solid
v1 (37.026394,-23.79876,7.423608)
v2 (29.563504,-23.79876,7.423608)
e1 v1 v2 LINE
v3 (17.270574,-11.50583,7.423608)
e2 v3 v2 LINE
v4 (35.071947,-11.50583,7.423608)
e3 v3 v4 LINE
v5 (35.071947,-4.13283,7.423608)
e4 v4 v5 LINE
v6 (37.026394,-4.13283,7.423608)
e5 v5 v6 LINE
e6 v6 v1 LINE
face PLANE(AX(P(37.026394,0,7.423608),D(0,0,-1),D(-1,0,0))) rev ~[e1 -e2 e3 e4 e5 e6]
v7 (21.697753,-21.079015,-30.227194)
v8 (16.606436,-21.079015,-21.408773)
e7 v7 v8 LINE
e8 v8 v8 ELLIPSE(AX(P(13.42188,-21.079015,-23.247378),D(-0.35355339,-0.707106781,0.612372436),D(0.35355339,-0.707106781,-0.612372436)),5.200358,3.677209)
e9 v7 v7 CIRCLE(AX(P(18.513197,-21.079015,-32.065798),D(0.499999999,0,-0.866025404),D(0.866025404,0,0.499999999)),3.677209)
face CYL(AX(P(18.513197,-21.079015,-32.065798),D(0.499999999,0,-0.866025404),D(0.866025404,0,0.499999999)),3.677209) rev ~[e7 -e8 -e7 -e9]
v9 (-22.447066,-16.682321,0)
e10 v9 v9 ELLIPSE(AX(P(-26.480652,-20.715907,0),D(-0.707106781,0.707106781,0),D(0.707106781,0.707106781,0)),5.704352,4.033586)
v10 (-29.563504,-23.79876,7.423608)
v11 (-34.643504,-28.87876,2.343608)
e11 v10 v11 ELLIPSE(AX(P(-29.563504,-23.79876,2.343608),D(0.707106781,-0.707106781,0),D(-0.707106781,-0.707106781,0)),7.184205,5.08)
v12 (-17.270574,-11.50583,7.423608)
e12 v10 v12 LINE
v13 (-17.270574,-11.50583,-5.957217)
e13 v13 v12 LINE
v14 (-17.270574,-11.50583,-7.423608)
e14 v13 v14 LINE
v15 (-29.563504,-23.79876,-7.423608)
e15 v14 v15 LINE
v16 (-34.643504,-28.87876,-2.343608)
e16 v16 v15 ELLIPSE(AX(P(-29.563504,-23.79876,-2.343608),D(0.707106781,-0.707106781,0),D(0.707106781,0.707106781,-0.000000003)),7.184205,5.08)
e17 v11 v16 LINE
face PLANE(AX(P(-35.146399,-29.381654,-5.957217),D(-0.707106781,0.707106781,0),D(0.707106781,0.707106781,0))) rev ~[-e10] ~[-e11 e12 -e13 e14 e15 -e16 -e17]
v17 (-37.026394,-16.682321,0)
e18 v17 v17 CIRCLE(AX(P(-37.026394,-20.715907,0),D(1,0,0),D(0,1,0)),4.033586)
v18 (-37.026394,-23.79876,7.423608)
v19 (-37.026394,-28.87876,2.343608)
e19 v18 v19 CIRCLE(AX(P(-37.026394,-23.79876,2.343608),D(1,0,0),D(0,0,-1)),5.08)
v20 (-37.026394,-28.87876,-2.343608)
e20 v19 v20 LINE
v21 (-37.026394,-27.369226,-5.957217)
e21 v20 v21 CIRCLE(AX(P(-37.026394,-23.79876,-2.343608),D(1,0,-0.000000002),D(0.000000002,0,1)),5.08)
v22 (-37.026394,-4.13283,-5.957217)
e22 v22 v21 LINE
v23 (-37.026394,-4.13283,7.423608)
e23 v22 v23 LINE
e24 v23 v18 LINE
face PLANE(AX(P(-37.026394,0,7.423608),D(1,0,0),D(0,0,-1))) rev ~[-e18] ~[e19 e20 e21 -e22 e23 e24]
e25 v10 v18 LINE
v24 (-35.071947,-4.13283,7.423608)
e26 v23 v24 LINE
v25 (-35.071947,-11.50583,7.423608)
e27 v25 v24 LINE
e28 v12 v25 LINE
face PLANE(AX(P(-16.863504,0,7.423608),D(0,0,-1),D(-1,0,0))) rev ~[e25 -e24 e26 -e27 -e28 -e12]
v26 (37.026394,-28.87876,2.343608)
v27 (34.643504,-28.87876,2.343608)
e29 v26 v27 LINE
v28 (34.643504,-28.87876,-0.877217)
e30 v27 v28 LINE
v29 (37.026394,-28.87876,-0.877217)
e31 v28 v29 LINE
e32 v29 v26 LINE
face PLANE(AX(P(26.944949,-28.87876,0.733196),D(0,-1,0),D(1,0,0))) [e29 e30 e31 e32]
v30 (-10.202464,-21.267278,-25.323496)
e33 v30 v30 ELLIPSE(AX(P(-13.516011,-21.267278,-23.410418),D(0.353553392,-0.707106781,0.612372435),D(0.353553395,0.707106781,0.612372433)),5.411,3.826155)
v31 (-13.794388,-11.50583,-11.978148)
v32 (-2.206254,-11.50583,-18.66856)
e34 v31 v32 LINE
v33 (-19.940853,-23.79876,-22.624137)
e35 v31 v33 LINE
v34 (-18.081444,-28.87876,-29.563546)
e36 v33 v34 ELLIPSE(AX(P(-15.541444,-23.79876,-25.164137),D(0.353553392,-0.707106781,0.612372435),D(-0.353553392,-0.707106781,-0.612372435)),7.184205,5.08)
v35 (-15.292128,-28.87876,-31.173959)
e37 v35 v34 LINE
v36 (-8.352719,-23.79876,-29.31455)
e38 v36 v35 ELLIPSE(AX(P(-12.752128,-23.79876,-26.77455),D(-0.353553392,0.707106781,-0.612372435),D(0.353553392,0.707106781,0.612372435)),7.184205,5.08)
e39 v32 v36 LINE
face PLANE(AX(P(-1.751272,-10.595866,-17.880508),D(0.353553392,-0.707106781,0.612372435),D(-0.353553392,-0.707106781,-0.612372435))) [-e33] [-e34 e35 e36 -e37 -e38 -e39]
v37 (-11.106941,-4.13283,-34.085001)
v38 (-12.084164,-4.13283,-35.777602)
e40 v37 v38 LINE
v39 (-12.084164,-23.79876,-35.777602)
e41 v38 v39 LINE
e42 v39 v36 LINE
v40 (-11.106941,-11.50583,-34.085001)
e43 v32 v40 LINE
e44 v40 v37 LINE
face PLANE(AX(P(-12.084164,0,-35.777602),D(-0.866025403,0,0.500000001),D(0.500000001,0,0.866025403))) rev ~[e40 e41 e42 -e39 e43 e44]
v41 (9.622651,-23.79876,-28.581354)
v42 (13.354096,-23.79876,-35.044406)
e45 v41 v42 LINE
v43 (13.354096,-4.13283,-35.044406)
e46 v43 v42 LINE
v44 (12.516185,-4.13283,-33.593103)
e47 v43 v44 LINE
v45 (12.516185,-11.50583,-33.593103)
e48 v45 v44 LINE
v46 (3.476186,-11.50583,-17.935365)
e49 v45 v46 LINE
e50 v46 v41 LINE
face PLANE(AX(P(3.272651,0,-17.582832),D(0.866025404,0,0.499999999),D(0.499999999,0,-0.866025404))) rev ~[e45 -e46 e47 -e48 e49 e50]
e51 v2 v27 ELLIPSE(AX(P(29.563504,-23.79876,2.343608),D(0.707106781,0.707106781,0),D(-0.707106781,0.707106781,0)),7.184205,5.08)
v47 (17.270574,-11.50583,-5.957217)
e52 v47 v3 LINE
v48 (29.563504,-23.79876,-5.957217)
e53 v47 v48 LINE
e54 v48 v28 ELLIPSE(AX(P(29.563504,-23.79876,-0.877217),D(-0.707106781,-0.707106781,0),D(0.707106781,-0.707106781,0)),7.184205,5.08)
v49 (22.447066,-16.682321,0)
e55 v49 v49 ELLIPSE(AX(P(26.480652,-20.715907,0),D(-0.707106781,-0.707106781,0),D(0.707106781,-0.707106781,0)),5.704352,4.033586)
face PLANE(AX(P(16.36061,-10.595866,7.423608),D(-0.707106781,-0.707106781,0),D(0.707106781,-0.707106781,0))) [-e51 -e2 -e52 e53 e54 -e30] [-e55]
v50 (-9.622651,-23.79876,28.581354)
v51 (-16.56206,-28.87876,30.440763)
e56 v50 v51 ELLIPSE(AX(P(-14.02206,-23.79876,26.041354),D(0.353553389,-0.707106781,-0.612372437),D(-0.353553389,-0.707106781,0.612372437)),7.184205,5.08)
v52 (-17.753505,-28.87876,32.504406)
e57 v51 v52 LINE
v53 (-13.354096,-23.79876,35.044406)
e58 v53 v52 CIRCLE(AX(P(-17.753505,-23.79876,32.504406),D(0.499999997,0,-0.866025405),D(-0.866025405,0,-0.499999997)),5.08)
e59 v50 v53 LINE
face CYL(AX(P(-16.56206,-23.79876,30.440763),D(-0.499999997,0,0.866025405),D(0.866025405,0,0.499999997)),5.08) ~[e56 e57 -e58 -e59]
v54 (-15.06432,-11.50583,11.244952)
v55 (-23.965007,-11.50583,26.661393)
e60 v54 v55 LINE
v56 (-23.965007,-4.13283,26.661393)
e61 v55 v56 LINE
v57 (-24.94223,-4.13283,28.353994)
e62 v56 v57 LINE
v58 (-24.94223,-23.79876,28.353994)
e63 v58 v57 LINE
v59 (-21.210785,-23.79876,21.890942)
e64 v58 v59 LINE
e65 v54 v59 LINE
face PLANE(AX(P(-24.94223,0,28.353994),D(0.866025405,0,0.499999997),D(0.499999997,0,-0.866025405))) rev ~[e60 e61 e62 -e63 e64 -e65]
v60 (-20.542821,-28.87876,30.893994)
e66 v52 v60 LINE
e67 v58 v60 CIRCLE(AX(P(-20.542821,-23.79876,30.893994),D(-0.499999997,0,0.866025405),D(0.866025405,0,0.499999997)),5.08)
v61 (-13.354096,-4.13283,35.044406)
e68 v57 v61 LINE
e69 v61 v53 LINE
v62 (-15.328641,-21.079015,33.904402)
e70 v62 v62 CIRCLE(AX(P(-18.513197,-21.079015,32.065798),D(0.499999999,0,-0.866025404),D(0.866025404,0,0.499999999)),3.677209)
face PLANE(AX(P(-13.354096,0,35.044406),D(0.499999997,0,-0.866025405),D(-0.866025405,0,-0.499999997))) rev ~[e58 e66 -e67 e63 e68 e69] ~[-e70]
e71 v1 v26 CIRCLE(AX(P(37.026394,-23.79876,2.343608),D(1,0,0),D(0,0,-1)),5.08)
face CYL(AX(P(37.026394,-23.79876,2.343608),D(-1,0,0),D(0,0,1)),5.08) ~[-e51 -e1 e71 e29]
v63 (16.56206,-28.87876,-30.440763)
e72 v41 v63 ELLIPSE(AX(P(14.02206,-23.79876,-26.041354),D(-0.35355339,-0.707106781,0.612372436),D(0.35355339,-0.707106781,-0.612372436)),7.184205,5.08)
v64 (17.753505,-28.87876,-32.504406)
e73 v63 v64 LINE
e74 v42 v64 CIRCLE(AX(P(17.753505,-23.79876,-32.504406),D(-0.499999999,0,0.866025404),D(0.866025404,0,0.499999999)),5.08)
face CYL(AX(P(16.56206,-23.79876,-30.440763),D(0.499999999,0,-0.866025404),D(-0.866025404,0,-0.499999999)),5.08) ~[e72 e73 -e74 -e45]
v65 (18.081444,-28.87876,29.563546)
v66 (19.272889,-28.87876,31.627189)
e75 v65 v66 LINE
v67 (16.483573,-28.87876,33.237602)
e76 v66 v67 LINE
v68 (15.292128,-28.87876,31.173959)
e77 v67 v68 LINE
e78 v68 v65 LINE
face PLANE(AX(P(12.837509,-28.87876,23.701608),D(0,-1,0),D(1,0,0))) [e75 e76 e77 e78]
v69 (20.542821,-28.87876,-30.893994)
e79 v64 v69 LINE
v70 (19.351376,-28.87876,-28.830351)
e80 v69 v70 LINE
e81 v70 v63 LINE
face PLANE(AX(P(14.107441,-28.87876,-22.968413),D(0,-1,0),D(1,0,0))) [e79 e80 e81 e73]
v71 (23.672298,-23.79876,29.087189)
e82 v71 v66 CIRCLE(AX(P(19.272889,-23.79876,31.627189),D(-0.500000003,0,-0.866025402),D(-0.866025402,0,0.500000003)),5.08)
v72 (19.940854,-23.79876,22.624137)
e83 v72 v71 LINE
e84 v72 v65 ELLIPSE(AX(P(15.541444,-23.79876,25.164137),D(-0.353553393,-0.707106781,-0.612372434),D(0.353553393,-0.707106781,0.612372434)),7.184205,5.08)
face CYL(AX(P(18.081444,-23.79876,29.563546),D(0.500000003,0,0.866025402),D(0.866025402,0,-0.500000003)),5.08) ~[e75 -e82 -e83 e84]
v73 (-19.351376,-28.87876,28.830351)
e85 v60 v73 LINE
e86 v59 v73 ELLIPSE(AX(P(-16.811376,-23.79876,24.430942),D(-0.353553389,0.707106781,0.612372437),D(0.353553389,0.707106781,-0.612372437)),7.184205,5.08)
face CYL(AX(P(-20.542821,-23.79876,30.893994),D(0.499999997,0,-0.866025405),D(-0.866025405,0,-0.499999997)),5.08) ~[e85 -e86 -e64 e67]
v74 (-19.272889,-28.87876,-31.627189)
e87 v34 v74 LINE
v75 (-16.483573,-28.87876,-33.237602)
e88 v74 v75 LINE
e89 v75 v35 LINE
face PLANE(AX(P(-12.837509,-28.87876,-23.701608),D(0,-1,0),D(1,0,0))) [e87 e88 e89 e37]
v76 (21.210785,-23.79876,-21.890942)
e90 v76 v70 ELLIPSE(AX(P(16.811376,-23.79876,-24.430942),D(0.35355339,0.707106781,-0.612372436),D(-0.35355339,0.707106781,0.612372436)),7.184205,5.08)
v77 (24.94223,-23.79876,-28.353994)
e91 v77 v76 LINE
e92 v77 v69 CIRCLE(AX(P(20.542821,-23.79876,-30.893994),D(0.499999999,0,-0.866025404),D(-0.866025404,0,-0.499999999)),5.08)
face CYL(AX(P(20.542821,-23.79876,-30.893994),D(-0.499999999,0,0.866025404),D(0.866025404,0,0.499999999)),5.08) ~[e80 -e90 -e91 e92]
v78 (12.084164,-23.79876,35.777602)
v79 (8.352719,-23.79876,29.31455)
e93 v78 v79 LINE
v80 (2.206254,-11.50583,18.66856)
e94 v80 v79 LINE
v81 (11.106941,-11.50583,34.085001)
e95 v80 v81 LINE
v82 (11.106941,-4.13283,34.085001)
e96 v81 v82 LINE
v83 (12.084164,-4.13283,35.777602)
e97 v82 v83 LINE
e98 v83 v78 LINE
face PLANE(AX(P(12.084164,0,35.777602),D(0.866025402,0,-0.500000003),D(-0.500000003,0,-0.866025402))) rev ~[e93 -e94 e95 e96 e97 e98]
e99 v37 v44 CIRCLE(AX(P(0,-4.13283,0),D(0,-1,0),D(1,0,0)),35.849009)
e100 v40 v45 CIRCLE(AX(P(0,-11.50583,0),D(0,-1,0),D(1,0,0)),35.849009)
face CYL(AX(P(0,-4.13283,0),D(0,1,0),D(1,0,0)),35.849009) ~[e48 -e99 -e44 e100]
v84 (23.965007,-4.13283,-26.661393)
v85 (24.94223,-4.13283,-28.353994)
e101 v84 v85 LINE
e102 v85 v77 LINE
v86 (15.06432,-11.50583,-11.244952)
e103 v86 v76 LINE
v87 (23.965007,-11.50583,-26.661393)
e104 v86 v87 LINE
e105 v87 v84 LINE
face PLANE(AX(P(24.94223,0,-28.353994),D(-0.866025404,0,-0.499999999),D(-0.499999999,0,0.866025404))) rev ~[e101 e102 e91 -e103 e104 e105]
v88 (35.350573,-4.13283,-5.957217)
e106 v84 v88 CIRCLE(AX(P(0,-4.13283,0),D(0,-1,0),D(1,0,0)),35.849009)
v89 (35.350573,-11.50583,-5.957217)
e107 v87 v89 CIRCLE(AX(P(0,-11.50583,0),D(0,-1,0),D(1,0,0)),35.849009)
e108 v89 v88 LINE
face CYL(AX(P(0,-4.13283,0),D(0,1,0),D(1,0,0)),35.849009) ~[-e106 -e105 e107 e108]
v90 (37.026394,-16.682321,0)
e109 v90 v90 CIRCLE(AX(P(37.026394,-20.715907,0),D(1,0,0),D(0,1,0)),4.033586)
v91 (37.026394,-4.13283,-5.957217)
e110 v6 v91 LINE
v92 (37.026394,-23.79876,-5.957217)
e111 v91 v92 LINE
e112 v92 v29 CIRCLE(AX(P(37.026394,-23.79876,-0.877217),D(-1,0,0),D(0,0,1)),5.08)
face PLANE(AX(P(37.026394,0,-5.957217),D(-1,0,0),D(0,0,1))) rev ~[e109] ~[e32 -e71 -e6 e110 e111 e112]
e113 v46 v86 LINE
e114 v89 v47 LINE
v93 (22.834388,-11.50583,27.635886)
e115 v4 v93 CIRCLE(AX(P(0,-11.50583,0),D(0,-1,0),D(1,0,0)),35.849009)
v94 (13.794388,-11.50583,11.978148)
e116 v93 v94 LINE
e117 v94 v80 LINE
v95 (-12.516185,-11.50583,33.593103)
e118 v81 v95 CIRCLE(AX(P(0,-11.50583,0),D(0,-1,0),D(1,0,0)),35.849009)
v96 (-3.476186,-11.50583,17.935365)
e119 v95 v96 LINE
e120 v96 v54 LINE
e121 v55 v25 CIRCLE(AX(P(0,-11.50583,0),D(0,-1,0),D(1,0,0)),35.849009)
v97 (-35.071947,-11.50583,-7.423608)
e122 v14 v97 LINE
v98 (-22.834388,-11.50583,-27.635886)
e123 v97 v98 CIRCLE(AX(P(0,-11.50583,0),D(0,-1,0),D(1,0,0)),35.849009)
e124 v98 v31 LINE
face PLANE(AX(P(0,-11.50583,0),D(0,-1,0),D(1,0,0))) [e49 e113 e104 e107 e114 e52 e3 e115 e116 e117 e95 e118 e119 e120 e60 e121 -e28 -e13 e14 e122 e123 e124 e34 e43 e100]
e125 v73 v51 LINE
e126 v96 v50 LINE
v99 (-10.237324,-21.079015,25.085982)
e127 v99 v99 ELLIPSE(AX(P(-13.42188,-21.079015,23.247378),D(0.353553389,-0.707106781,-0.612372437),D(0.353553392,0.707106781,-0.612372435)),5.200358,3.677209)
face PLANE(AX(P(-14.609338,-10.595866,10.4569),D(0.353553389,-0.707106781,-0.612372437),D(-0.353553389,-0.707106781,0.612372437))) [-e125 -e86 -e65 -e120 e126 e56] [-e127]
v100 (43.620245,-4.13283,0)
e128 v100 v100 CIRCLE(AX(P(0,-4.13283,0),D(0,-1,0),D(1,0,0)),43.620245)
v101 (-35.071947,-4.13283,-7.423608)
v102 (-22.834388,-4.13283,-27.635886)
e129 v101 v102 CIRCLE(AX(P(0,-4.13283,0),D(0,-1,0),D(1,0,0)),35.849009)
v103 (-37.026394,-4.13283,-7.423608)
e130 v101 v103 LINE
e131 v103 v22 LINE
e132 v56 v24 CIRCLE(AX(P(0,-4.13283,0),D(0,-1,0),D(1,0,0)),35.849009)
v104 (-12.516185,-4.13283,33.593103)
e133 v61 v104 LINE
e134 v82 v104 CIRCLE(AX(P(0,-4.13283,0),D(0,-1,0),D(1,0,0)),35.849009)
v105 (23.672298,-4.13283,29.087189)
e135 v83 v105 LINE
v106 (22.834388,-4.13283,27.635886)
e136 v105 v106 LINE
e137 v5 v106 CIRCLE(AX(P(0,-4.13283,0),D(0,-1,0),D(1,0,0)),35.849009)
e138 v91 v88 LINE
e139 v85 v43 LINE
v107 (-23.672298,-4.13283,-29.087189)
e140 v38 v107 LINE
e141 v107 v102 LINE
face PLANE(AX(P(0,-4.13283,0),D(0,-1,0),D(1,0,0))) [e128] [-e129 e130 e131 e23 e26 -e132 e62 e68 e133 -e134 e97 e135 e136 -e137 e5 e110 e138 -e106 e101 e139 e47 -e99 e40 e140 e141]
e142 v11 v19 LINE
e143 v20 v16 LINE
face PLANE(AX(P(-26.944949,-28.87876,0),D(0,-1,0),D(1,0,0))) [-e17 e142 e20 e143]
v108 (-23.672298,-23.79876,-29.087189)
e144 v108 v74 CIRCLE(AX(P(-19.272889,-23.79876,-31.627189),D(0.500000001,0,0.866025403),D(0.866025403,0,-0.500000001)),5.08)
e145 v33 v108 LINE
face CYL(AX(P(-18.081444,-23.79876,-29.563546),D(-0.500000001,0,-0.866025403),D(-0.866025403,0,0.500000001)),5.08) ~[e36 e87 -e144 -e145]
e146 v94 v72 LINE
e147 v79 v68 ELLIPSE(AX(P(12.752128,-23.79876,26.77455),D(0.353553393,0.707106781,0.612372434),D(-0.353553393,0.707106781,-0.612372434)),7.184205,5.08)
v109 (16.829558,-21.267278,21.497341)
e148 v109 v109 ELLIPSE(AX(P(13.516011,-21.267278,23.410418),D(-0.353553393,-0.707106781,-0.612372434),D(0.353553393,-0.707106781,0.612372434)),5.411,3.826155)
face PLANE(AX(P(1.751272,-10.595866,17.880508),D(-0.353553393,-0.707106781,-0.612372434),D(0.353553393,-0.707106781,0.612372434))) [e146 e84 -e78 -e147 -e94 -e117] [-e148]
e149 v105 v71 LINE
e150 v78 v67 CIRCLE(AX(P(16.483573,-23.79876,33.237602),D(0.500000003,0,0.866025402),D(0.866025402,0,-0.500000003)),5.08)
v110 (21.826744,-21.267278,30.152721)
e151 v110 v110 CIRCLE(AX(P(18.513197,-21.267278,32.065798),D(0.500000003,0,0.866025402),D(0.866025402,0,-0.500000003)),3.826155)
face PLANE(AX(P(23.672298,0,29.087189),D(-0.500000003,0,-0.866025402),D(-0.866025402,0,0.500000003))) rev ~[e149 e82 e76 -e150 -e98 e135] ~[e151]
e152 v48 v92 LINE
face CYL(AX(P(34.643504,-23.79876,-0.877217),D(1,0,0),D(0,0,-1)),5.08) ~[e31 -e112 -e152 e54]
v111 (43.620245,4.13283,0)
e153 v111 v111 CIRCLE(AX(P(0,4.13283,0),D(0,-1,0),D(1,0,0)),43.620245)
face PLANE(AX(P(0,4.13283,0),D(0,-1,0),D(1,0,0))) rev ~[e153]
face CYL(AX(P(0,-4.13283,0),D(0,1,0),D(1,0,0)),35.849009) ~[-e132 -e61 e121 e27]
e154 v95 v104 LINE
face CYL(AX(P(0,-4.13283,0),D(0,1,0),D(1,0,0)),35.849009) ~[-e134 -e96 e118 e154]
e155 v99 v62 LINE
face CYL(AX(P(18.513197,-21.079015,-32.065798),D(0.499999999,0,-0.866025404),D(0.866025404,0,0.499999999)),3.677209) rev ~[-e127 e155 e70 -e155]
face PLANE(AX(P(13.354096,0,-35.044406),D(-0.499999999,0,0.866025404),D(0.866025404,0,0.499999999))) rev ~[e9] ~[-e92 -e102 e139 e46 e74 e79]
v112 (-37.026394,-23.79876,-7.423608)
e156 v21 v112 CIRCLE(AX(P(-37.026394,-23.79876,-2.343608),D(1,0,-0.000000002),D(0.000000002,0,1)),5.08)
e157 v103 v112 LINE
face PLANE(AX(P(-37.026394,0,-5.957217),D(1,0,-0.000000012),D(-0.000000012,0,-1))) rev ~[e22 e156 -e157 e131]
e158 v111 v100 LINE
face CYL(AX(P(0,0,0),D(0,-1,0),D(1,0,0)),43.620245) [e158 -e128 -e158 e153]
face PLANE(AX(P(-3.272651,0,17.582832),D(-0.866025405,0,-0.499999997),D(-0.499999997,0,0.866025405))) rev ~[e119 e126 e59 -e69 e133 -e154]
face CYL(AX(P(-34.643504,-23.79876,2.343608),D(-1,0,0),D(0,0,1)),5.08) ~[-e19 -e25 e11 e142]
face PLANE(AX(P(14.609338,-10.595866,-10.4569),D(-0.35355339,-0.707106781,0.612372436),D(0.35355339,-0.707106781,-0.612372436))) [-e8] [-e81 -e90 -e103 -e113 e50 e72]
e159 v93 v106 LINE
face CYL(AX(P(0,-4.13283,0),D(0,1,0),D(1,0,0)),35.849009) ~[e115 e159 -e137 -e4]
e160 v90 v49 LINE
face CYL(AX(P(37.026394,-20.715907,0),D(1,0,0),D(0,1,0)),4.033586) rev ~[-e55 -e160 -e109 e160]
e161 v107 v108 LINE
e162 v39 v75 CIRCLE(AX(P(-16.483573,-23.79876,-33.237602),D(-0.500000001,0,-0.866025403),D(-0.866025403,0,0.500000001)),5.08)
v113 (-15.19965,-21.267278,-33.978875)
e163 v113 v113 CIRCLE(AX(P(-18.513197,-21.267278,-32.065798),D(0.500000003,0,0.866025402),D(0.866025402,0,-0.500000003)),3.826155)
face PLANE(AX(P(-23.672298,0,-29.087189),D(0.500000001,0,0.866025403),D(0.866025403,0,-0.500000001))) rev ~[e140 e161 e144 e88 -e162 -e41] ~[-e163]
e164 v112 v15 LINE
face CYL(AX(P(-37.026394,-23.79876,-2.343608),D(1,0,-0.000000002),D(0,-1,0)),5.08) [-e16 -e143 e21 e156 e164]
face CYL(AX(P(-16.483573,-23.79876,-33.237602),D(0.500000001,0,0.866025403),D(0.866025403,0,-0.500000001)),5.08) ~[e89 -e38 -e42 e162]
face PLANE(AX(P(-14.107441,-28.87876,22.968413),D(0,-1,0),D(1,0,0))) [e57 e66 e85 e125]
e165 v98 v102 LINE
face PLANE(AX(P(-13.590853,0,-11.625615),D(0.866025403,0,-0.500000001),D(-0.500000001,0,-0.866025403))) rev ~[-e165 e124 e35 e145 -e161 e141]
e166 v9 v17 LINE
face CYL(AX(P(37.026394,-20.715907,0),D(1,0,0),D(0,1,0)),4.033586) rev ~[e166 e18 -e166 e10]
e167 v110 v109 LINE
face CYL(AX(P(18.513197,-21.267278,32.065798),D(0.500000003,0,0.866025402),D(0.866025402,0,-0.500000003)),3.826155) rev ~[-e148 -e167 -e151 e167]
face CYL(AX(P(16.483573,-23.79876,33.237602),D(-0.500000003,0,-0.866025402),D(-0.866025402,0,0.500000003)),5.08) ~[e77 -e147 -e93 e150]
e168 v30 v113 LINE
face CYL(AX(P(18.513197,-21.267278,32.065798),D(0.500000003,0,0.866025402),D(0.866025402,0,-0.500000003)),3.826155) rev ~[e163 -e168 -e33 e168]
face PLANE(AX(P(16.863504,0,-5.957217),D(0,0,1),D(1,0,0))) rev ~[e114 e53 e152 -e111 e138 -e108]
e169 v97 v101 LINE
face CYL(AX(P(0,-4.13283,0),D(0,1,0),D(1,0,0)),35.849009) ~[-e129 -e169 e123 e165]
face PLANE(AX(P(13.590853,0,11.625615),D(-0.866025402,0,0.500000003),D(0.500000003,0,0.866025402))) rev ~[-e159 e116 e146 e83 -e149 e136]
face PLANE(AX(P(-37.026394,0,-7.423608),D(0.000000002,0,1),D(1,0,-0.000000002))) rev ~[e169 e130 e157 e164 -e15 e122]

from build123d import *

# Parameters (mm, degrees)
F0_R         = 43.6202450144
F1_DEPTH     = 4.13283
F2_R         = 35.8490091113
F3_DEPTH     = 7.373
F5_DEPTH     = 28.71845
F6_T4_DEPTH  = 13.3808250539
F6_T9_DEPTH  = 1.4663911018
F7_T4_DEPTH  = 13.3808250539
F8_DEPTH     = 28.87876
F9_T4_DEPTH  = 13.3808250539
F9_T9_DEPTH  = 13.3808250539
F9_T14_DEPTH = 13.3808250539
F9_T19_DEPTH = 1.4663911018
F9_T24_DEPTH = 13.3808250539
F9_T29_DEPTH = 13.3808250539
F9_T34_DEPTH = 13.3808250539
F10_R        = 5.08
F11_R        = 4.0335860218
F12_DEPTH    = 87.80528
F14_R        = 3.8261546388
F15_DEPTH    = 90.21009
F17_R        = 3.6772087236
F18_DEPTH    = 79.11967


# Not quite as in the source:
# - a fillet or chamfer that OpenCascade refuses, or shapes differently, is made with other operations: its cross-section is extruded or revolved along the edge and cut away or added


with BuildPart() as f1:
    # F0 (on Front) → F1 (new body, symmetric)
    with BuildSketch(Plane.XZ):
        Circle(F0_R)
    extrude(amount=F1_DEPTH, both=True)

    # F2 (on face) → F3 (join)
    with BuildSketch(Plane.XZ.offset(4.13283)):
        Circle(F2_R)
    extrude(amount=F3_DEPTH)

    # F4 (on Front) → F5 (join)
    with BuildSketch(Plane.XZ):
        Polygon((-16.8635044247, 7.4236080982), (-37.0263941586, 7.4236080982), (-37.0263941586, 5.957217045), (-37.0263941586, -5.9572169557), (-37.0263941765, -7.4236080089), (-16.8635044426, -7.4236080575), (-16.863504439, -5.9572169557), (-16.8635044247, -5.224020686), (-16.8635044247, 5.2240207266), (-16.8635044247, 5.9572169964), align=None)
        Polygon((37.0263941586, 7.4236080982), (16.8635044247, 7.4236080982), (16.8635044247, -5.224020686), (16.8635044247, -5.9572169557), (37.0263941586, -5.9572169557), align=None)
        Polygon((24.9422302573, -28.3539939228), (14.8607854044, -10.8924191915), (3.9076175745, -17.2162335748), (3.2726509787, -17.5828317091), (13.3540958316, -35.0444064405), align=None)
        Polygon((-12.084163936, -35.7776019816), (-2.002719041, -18.3160272745), (-12.9558868556, -11.9922128648), (-13.5908534505, -11.6256147289), (-23.6722983455, -29.087189436), align=None)
        Polygon((-24.9422301889, 28.3539939829), (-14.8607853781, 10.8924192273), (-3.907617533, 17.2162335842), (-3.2726509363, 17.582831717), (-13.3540957472, 35.0444064727), align=None)
        Polygon((12.0841640223, 35.7776019524), (2.0027190852, 18.3160272697), (12.9558868845, 11.9922128336), (13.5908534786, 11.6256146962), (23.6722984157, 29.0871893789), align=None)
    extrude(amount=F5_DEPTH)

    # F6: chamfer of 17.78 on 1 edges, made by hand


with BuildPart() as f6_tool2:
    # F6_s3 → F6_t4 (new body)
    with BuildSketch(Plane.XY.offset(-5.9572169557)):
        with BuildLine():
            Line((-35.1463987747, -29.2213443428), (-16.3606100891, -10.4355556572))
            Line((-16.3606100891, -10.4355556572), (-16.0050100891, -10.4355556572))
            ThreePointArc((-16.0050100891, -10.4355556572), (-16.5079044319, -19.5770028286), (-16.5079044319, -28.71845))
            Line((-16.5079044319, -28.71845), (-16.8635044319, -29.07405))
            ThreePointArc((-16.8635044319, -29.07405), (-26.0049516033, -29.07405), (-35.1463987747, -29.5769443428))
            Line((-35.1463987747, -29.5769443428), (-35.1463987747, -29.2213443428))
        make_face()
    extrude(amount=F6_T4_DEPTH)

    split(bisect_by=Plane.XZ.offset(11.50583), keep=Keep.TOP)


with BuildPart() as f1_1:
    add(f1.part)

    # F6_t1: cut F6_tool2
    add(f6_tool2.part, mode=Mode.SUBTRACT)


with BuildPart() as f6_tool7:
    # F6_s8 → F6_t9 (new body)
    with BuildSketch(Plane.XY.offset(-7.4236080575)):
        with BuildLine():
            Line((-35.1463987854, -29.2213443428), (-16.3606100998, -10.4355556572))
            Line((-16.3606100998, -10.4355556572), (-16.0050100998, -10.4355556572))
            ThreePointArc((-16.0050100998, -10.4355556572), (-16.5079044426, -19.5770028286), (-16.5079044426, -28.71845))
            Line((-16.5079044426, -28.71845), (-16.8635044426, -29.07405))
            ThreePointArc((-16.8635044426, -29.07405), (-26.004951614, -29.07405), (-35.1463987854, -29.5769443428))
            Line((-35.1463987854, -29.5769443428), (-35.1463987854, -29.2213443428))
        make_face()
    extrude(amount=F6_T9_DEPTH)

    split(bisect_by=Plane.XZ.offset(11.50583), keep=Keep.TOP)


with BuildPart() as f1_2:
    add(f1_1.part)

    # F6_t6: cut F6_tool7
    add(f6_tool7.part, mode=Mode.SUBTRACT)

    # F7: chamfer of 17.78 on 1 edges, made by hand


with BuildPart() as f7_tool2:
    # F7_s3 → F7_t4 (new body)
    with BuildSketch(Plane.XY.offset(7.4236080982)):
        with BuildLine():
            Line((35.1463987675, -29.2213443428), (16.3606100819, -10.4355556572))
            Line((16.3606100819, -10.4355556572), (16.0050100819, -10.4355556572))
            ThreePointArc((16.0050100819, -10.4355556572), (16.5079044247, -19.5770028286), (16.5079044247, -28.71845))
            Line((16.5079044247, -28.71845), (16.8635044247, -29.07405))
            ThreePointArc((16.8635044247, -29.07405), (26.0049515961, -29.07405), (35.1463987675, -29.5769443428))
            Line((35.1463987675, -29.5769443428), (35.1463987675, -29.2213443428))
        make_face()
    extrude(amount=-F7_T4_DEPTH)

    split(bisect_by=Plane.XZ.offset(11.50583), keep=Keep.TOP)


with BuildPart() as f1_3:
    add(f1_2.part)

    # F7_t1: cut F7_tool2
    add(f7_tool2.part, mode=Mode.SUBTRACT)

    # F4 (on Front) → F8 (join)
    with BuildSketch(Plane.XZ):
        Polygon((-16.8635044247, 7.4236080982), (-37.0263941586, 7.4236080982), (-37.0263941586, 5.957217045), (-37.0263941586, -5.9572169557), (-37.0263941765, -7.4236080089), (-16.8635044426, -7.4236080575), (-16.863504439, -5.9572169557), (-16.8635044247, -5.224020686), (-16.8635044247, 5.2240207266), (-16.8635044247, 5.9572169964), align=None)
        Polygon((37.0263941586, 7.4236080982), (16.8635044247, 7.4236080982), (16.8635044247, -5.224020686), (16.8635044247, -5.9572169557), (37.0263941586, -5.9572169557), align=None)
        Polygon((24.9422302573, -28.3539939228), (14.8607854044, -10.8924191915), (3.9076175745, -17.2162335748), (3.2726509787, -17.5828317091), (13.3540958316, -35.0444064405), align=None)
        Polygon((-12.084163936, -35.7776019816), (-2.002719041, -18.3160272745), (-12.9558868556, -11.9922128648), (-13.5908534505, -11.6256147289), (-23.6722983455, -29.087189436), align=None)
        Polygon((-24.9422301889, 28.3539939829), (-14.8607853781, 10.8924192273), (-3.907617533, 17.2162335842), (-3.2726509363, 17.582831717), (-13.3540957472, 35.0444064727), align=None)
        Polygon((12.0841640223, 35.7776019524), (2.0027190852, 18.3160272697), (12.9558868845, 11.9922128336), (13.5908534786, 11.6256146962), (23.6722984157, 29.0871893789), align=None)
    extrude(amount=F8_DEPTH)

    # F9: chamfer of 17.78 on 7 edges, made by hand


with BuildPart() as f9_tool2:
    # F9_s3 → F9_t4 (new body)
    with BuildSketch(Plane(origin=(-6.4290331859, 0, 3.7118040749), x_dir=(0, 1, 0), z_dir=(0.8660254018, 0, -0.5000000035))):
        with BuildLine():
            Line((-10.5958656572, 16.3606100819), (-29.3816543428, 35.1463987675))
            Line((-29.3816543428, 35.1463987675), (-29.7372543428, 35.1463987675))
            ThreePointArc((-29.7372543428, 35.1463987675), (-29.23436, 26.0049515961), (-29.23436, 16.8635044247))
            Line((-29.23436, 16.8635044247), (-28.87876, 16.5079044247))
            ThreePointArc((-28.87876, 16.5079044247), (-19.7373128286, 16.5079044247), (-10.5958656572, 16.0050100819))
            Line((-10.5958656572, 16.0050100819), (-10.5958656572, 16.3606100819))
        make_face()
    extrude(amount=F9_T4_DEPTH)

    split(bisect_by=Plane.XZ.offset(11.50583), keep=Keep.TOP)


with BuildPart() as f1_4:
    add(f1_3.part)

    # F9_t1: cut F9_tool2
    add(f9_tool2.part, mode=Mode.SUBTRACT)


with BuildPart() as f9_tool7:
    # F9_s8 → F9_t9 (new body)
    with BuildSketch(Plane(origin=(-6.4290332127, 0, -3.7118040284), x_dir=(0, 1, 0), z_dir=(0.8660254054, 0, 0.4999999972))):
        with BuildLine():
            Line((-10.5958656572, 16.3606100819), (-29.3816543428, 35.1463987675))
            Line((-29.3816543428, 35.1463987675), (-29.7372543428, 35.1463987675))
            ThreePointArc((-29.7372543428, 35.1463987675), (-29.23436, 26.0049515961), (-29.23436, 16.8635044247))
            Line((-29.23436, 16.8635044247), (-28.87876, 16.5079044247))
            ThreePointArc((-28.87876, 16.5079044247), (-19.7373128286, 16.5079044247), (-10.5958656572, 16.0050100819))
            Line((-10.5958656572, 16.0050100819), (-10.5958656572, 16.3606100819))
        make_face()
    extrude(amount=F9_T9_DEPTH)

    split(bisect_by=Plane.XZ.offset(11.50583), keep=Keep.TOP)


with BuildPart() as f1_5:
    add(f1_4.part)

    # F9_t6: cut F9_tool7
    add(f9_tool7.part, mode=Mode.SUBTRACT)


with BuildPart() as f9_tool12:
    # F9_s13 → F9_t14 (new body)
    with BuildSketch(Plane.XY.offset(-5.9572169557)):
        with BuildLine():
            Line((-35.1463987747, -29.3816543428), (-16.3606100891, -10.5958656572))
            Line((-16.3606100891, -10.5958656572), (-16.0050100891, -10.5958656572))
            ThreePointArc((-16.0050100891, -10.5958656572), (-16.5079044319, -19.7373128286), (-16.5079044319, -28.87876))
            Line((-16.5079044319, -28.87876), (-16.8635044319, -29.23436))
            ThreePointArc((-16.8635044319, -29.23436), (-26.0049516033, -29.23436), (-35.1463987747, -29.7372543428))
            Line((-35.1463987747, -29.7372543428), (-35.1463987747, -29.3816543428))
        make_face()
    extrude(amount=F9_T14_DEPTH)

    split(bisect_by=Plane.XZ.offset(11.50583), keep=Keep.TOP)


with BuildPart() as f1_6:
    add(f1_5.part)

    # F9_t11: cut F9_tool12
    add(f9_tool12.part, mode=Mode.SUBTRACT)


with BuildPart() as f9_tool17:
    # F9_s18 → F9_t19 (new body)
    with BuildSketch(Plane.XY.offset(-7.4236080575)):
        with BuildLine():
            Line((-16.3606100998, -10.5958656572), (-35.1463987854, -29.3816543428))
            Line((-35.1463987854, -29.3816543428), (-35.1463987854, -29.7372543428))
            ThreePointArc((-35.1463987854, -29.7372543428), (-26.004951614, -29.23436), (-16.8635044426, -29.23436))
            Line((-16.8635044426, -29.23436), (-16.5079044426, -28.87876))
            ThreePointArc((-16.5079044426, -28.87876), (-16.5079044426, -19.7373128286), (-16.0050100998, -10.5958656572))
            Line((-16.0050100998, -10.5958656572), (-16.3606100998, -10.5958656572))
        make_face()
    extrude(amount=F9_T19_DEPTH)

    split(bisect_by=Plane.XZ.offset(11.50583), keep=Keep.TOP)


with BuildPart() as f1_7:
    add(f1_6.part)

    # F9_t16: cut F9_tool17
    add(f9_tool17.part, mode=Mode.SUBTRACT)


with BuildPart() as f9_tool22:
    # F9_s23 → F9_t24 (new body)
    with BuildSketch(Plane(origin=(6.4290331948, 0, -3.7118040594), x_dir=(0, 1, 0), z_dir=(-0.866025403, 0, 0.5000000014))):
        with BuildLine():
            Line((-10.5958656572, 16.3606100819), (-29.3816543428, 35.1463987675))
            Line((-29.3816543428, 35.1463987675), (-29.7372543428, 35.1463987675))
            ThreePointArc((-29.7372543428, 35.1463987675), (-29.23436, 26.0049515961), (-29.23436, 16.8635044247))
            Line((-29.23436, 16.8635044247), (-28.87876, 16.5079044247))
            ThreePointArc((-28.87876, 16.5079044247), (-19.7373128286, 16.5079044247), (-10.5958656572, 16.0050100819))
            Line((-10.5958656572, 16.0050100819), (-10.5958656572, 16.3606100819))
        make_face()
    extrude(amount=F9_T24_DEPTH)

    split(bisect_by=Plane.XZ.offset(11.50583), keep=Keep.TOP)


with BuildPart() as f1_8:
    add(f1_7.part)

    # F9_t21: cut F9_tool22
    add(f9_tool22.part, mode=Mode.SUBTRACT)


with BuildPart() as f9_tool27:
    # F9_s28 → F9_t29 (new body)
    with BuildSketch(Plane(origin=(6.4290332037, 0, 3.7118040439), x_dir=(0, 1, 0), z_dir=(-0.8660254042, 0, -0.4999999993))):
        with BuildLine():
            Line((-10.5958656572, 16.3606100819), (-29.3816543428, 35.1463987675))
            Line((-29.3816543428, 35.1463987675), (-29.7372543428, 35.1463987675))
            ThreePointArc((-29.7372543428, 35.1463987675), (-29.23436, 26.0049515961), (-29.23436, 16.8635044247))
            Line((-29.23436, 16.8635044247), (-28.87876, 16.5079044247))
            ThreePointArc((-28.87876, 16.5079044247), (-19.7373128286, 16.5079044247), (-10.5958656572, 16.0050100819))
            Line((-10.5958656572, 16.0050100819), (-10.5958656572, 16.3606100819))
        make_face()
    extrude(amount=F9_T29_DEPTH)

    split(bisect_by=Plane.XZ.offset(11.50583), keep=Keep.TOP)


with BuildPart() as f1_9:
    add(f1_8.part)

    # F9_t26: cut F9_tool27
    add(f9_tool27.part, mode=Mode.SUBTRACT)


with BuildPart() as f9_tool32:
    # F9_s33 → F9_t34 (new body)
    with BuildSketch(Plane.XY.offset(7.4236080982)):
        with BuildLine():
            Line((16.3606100819, -10.5958656572), (35.1463987675, -29.3816543428))
            Line((35.1463987675, -29.3816543428), (35.1463987675, -29.7372543428))
            ThreePointArc((35.1463987675, -29.7372543428), (26.0049515961, -29.23436), (16.8635044247, -29.23436))
            Line((16.8635044247, -29.23436), (16.5079044247, -28.87876))
            ThreePointArc((16.5079044247, -28.87876), (16.5079044247, -19.7373128286), (16.0050100819, -10.5958656572))
            Line((16.0050100819, -10.5958656572), (16.3606100819, -10.5958656572))
        make_face()
    extrude(amount=-F9_T34_DEPTH)

    split(bisect_by=Plane.XZ.offset(11.50583), keep=Keep.TOP)


with BuildPart() as f1_10:
    add(f1_9.part)

    # F9_t31: cut F9_tool32
    add(f9_tool32.part, mode=Mode.SUBTRACT)

    # F10
    f10_edges = [f1_10.edges().sort_by_distance(p)[0] for p in [
        (12.758373, -28.87876, -34.012585),
        (24.346508, -28.87876, -27.322172),
        (-11.488442, -28.87876, -34.74578),
        (-23.076576, -28.87876, -28.055368),
        (-35.834949, -28.87876, -7.423608),
        (-35.834949, -28.87876, 7.423608),
        (35.834949, -28.87876, 7.423608),
        (35.834949, -28.87876, -5.957217),
        (23.076576, -28.87876, 28.055368),
        (11.488442, -28.87876, 34.74578),
        (-24.346508, -28.87876, 27.322172),
        (-12.758373, -28.87876, 34.012585),
    ]]
    fillet(f10_edges, radius=F10_R)

    # F11 (on face) → F12 (cut)
    with BuildSketch(Plane.YZ.offset(37.0263941586)):
        with Locations((-20.7159072161, 0)):
            Circle(F11_R)
    extrude(amount=-F12_DEPTH, mode=Mode.SUBTRACT)

    # F14 (on face) → F15 (cut)
    with BuildSketch(Plane(origin=(18.5131972081, 0, 32.0657978775), x_dir=(0.8660254018, 0, -0.5000000035), z_dir=(0.5000000035, 0, 0.8660254018))):
        with Locations((0, -21.2672781199)):
            Circle(F14_R)
    extrude(amount=-F15_DEPTH, mode=Mode.SUBTRACT)

    # F17 (on face) → F18 (cut)
    with BuildSketch(Plane(origin=(18.5131970535, 0, -32.0657979668), x_dir=(0.8660254042, 0, 0.4999999993), z_dir=(0.4999999993, 0, -0.8660254042))):
        with Locations((0, 21.0790149868)):
            Circle(F17_R)
    extrude(amount=-F18_DEPTH, mode=Mode.SUBTRACT)


solid = f1_10.part
